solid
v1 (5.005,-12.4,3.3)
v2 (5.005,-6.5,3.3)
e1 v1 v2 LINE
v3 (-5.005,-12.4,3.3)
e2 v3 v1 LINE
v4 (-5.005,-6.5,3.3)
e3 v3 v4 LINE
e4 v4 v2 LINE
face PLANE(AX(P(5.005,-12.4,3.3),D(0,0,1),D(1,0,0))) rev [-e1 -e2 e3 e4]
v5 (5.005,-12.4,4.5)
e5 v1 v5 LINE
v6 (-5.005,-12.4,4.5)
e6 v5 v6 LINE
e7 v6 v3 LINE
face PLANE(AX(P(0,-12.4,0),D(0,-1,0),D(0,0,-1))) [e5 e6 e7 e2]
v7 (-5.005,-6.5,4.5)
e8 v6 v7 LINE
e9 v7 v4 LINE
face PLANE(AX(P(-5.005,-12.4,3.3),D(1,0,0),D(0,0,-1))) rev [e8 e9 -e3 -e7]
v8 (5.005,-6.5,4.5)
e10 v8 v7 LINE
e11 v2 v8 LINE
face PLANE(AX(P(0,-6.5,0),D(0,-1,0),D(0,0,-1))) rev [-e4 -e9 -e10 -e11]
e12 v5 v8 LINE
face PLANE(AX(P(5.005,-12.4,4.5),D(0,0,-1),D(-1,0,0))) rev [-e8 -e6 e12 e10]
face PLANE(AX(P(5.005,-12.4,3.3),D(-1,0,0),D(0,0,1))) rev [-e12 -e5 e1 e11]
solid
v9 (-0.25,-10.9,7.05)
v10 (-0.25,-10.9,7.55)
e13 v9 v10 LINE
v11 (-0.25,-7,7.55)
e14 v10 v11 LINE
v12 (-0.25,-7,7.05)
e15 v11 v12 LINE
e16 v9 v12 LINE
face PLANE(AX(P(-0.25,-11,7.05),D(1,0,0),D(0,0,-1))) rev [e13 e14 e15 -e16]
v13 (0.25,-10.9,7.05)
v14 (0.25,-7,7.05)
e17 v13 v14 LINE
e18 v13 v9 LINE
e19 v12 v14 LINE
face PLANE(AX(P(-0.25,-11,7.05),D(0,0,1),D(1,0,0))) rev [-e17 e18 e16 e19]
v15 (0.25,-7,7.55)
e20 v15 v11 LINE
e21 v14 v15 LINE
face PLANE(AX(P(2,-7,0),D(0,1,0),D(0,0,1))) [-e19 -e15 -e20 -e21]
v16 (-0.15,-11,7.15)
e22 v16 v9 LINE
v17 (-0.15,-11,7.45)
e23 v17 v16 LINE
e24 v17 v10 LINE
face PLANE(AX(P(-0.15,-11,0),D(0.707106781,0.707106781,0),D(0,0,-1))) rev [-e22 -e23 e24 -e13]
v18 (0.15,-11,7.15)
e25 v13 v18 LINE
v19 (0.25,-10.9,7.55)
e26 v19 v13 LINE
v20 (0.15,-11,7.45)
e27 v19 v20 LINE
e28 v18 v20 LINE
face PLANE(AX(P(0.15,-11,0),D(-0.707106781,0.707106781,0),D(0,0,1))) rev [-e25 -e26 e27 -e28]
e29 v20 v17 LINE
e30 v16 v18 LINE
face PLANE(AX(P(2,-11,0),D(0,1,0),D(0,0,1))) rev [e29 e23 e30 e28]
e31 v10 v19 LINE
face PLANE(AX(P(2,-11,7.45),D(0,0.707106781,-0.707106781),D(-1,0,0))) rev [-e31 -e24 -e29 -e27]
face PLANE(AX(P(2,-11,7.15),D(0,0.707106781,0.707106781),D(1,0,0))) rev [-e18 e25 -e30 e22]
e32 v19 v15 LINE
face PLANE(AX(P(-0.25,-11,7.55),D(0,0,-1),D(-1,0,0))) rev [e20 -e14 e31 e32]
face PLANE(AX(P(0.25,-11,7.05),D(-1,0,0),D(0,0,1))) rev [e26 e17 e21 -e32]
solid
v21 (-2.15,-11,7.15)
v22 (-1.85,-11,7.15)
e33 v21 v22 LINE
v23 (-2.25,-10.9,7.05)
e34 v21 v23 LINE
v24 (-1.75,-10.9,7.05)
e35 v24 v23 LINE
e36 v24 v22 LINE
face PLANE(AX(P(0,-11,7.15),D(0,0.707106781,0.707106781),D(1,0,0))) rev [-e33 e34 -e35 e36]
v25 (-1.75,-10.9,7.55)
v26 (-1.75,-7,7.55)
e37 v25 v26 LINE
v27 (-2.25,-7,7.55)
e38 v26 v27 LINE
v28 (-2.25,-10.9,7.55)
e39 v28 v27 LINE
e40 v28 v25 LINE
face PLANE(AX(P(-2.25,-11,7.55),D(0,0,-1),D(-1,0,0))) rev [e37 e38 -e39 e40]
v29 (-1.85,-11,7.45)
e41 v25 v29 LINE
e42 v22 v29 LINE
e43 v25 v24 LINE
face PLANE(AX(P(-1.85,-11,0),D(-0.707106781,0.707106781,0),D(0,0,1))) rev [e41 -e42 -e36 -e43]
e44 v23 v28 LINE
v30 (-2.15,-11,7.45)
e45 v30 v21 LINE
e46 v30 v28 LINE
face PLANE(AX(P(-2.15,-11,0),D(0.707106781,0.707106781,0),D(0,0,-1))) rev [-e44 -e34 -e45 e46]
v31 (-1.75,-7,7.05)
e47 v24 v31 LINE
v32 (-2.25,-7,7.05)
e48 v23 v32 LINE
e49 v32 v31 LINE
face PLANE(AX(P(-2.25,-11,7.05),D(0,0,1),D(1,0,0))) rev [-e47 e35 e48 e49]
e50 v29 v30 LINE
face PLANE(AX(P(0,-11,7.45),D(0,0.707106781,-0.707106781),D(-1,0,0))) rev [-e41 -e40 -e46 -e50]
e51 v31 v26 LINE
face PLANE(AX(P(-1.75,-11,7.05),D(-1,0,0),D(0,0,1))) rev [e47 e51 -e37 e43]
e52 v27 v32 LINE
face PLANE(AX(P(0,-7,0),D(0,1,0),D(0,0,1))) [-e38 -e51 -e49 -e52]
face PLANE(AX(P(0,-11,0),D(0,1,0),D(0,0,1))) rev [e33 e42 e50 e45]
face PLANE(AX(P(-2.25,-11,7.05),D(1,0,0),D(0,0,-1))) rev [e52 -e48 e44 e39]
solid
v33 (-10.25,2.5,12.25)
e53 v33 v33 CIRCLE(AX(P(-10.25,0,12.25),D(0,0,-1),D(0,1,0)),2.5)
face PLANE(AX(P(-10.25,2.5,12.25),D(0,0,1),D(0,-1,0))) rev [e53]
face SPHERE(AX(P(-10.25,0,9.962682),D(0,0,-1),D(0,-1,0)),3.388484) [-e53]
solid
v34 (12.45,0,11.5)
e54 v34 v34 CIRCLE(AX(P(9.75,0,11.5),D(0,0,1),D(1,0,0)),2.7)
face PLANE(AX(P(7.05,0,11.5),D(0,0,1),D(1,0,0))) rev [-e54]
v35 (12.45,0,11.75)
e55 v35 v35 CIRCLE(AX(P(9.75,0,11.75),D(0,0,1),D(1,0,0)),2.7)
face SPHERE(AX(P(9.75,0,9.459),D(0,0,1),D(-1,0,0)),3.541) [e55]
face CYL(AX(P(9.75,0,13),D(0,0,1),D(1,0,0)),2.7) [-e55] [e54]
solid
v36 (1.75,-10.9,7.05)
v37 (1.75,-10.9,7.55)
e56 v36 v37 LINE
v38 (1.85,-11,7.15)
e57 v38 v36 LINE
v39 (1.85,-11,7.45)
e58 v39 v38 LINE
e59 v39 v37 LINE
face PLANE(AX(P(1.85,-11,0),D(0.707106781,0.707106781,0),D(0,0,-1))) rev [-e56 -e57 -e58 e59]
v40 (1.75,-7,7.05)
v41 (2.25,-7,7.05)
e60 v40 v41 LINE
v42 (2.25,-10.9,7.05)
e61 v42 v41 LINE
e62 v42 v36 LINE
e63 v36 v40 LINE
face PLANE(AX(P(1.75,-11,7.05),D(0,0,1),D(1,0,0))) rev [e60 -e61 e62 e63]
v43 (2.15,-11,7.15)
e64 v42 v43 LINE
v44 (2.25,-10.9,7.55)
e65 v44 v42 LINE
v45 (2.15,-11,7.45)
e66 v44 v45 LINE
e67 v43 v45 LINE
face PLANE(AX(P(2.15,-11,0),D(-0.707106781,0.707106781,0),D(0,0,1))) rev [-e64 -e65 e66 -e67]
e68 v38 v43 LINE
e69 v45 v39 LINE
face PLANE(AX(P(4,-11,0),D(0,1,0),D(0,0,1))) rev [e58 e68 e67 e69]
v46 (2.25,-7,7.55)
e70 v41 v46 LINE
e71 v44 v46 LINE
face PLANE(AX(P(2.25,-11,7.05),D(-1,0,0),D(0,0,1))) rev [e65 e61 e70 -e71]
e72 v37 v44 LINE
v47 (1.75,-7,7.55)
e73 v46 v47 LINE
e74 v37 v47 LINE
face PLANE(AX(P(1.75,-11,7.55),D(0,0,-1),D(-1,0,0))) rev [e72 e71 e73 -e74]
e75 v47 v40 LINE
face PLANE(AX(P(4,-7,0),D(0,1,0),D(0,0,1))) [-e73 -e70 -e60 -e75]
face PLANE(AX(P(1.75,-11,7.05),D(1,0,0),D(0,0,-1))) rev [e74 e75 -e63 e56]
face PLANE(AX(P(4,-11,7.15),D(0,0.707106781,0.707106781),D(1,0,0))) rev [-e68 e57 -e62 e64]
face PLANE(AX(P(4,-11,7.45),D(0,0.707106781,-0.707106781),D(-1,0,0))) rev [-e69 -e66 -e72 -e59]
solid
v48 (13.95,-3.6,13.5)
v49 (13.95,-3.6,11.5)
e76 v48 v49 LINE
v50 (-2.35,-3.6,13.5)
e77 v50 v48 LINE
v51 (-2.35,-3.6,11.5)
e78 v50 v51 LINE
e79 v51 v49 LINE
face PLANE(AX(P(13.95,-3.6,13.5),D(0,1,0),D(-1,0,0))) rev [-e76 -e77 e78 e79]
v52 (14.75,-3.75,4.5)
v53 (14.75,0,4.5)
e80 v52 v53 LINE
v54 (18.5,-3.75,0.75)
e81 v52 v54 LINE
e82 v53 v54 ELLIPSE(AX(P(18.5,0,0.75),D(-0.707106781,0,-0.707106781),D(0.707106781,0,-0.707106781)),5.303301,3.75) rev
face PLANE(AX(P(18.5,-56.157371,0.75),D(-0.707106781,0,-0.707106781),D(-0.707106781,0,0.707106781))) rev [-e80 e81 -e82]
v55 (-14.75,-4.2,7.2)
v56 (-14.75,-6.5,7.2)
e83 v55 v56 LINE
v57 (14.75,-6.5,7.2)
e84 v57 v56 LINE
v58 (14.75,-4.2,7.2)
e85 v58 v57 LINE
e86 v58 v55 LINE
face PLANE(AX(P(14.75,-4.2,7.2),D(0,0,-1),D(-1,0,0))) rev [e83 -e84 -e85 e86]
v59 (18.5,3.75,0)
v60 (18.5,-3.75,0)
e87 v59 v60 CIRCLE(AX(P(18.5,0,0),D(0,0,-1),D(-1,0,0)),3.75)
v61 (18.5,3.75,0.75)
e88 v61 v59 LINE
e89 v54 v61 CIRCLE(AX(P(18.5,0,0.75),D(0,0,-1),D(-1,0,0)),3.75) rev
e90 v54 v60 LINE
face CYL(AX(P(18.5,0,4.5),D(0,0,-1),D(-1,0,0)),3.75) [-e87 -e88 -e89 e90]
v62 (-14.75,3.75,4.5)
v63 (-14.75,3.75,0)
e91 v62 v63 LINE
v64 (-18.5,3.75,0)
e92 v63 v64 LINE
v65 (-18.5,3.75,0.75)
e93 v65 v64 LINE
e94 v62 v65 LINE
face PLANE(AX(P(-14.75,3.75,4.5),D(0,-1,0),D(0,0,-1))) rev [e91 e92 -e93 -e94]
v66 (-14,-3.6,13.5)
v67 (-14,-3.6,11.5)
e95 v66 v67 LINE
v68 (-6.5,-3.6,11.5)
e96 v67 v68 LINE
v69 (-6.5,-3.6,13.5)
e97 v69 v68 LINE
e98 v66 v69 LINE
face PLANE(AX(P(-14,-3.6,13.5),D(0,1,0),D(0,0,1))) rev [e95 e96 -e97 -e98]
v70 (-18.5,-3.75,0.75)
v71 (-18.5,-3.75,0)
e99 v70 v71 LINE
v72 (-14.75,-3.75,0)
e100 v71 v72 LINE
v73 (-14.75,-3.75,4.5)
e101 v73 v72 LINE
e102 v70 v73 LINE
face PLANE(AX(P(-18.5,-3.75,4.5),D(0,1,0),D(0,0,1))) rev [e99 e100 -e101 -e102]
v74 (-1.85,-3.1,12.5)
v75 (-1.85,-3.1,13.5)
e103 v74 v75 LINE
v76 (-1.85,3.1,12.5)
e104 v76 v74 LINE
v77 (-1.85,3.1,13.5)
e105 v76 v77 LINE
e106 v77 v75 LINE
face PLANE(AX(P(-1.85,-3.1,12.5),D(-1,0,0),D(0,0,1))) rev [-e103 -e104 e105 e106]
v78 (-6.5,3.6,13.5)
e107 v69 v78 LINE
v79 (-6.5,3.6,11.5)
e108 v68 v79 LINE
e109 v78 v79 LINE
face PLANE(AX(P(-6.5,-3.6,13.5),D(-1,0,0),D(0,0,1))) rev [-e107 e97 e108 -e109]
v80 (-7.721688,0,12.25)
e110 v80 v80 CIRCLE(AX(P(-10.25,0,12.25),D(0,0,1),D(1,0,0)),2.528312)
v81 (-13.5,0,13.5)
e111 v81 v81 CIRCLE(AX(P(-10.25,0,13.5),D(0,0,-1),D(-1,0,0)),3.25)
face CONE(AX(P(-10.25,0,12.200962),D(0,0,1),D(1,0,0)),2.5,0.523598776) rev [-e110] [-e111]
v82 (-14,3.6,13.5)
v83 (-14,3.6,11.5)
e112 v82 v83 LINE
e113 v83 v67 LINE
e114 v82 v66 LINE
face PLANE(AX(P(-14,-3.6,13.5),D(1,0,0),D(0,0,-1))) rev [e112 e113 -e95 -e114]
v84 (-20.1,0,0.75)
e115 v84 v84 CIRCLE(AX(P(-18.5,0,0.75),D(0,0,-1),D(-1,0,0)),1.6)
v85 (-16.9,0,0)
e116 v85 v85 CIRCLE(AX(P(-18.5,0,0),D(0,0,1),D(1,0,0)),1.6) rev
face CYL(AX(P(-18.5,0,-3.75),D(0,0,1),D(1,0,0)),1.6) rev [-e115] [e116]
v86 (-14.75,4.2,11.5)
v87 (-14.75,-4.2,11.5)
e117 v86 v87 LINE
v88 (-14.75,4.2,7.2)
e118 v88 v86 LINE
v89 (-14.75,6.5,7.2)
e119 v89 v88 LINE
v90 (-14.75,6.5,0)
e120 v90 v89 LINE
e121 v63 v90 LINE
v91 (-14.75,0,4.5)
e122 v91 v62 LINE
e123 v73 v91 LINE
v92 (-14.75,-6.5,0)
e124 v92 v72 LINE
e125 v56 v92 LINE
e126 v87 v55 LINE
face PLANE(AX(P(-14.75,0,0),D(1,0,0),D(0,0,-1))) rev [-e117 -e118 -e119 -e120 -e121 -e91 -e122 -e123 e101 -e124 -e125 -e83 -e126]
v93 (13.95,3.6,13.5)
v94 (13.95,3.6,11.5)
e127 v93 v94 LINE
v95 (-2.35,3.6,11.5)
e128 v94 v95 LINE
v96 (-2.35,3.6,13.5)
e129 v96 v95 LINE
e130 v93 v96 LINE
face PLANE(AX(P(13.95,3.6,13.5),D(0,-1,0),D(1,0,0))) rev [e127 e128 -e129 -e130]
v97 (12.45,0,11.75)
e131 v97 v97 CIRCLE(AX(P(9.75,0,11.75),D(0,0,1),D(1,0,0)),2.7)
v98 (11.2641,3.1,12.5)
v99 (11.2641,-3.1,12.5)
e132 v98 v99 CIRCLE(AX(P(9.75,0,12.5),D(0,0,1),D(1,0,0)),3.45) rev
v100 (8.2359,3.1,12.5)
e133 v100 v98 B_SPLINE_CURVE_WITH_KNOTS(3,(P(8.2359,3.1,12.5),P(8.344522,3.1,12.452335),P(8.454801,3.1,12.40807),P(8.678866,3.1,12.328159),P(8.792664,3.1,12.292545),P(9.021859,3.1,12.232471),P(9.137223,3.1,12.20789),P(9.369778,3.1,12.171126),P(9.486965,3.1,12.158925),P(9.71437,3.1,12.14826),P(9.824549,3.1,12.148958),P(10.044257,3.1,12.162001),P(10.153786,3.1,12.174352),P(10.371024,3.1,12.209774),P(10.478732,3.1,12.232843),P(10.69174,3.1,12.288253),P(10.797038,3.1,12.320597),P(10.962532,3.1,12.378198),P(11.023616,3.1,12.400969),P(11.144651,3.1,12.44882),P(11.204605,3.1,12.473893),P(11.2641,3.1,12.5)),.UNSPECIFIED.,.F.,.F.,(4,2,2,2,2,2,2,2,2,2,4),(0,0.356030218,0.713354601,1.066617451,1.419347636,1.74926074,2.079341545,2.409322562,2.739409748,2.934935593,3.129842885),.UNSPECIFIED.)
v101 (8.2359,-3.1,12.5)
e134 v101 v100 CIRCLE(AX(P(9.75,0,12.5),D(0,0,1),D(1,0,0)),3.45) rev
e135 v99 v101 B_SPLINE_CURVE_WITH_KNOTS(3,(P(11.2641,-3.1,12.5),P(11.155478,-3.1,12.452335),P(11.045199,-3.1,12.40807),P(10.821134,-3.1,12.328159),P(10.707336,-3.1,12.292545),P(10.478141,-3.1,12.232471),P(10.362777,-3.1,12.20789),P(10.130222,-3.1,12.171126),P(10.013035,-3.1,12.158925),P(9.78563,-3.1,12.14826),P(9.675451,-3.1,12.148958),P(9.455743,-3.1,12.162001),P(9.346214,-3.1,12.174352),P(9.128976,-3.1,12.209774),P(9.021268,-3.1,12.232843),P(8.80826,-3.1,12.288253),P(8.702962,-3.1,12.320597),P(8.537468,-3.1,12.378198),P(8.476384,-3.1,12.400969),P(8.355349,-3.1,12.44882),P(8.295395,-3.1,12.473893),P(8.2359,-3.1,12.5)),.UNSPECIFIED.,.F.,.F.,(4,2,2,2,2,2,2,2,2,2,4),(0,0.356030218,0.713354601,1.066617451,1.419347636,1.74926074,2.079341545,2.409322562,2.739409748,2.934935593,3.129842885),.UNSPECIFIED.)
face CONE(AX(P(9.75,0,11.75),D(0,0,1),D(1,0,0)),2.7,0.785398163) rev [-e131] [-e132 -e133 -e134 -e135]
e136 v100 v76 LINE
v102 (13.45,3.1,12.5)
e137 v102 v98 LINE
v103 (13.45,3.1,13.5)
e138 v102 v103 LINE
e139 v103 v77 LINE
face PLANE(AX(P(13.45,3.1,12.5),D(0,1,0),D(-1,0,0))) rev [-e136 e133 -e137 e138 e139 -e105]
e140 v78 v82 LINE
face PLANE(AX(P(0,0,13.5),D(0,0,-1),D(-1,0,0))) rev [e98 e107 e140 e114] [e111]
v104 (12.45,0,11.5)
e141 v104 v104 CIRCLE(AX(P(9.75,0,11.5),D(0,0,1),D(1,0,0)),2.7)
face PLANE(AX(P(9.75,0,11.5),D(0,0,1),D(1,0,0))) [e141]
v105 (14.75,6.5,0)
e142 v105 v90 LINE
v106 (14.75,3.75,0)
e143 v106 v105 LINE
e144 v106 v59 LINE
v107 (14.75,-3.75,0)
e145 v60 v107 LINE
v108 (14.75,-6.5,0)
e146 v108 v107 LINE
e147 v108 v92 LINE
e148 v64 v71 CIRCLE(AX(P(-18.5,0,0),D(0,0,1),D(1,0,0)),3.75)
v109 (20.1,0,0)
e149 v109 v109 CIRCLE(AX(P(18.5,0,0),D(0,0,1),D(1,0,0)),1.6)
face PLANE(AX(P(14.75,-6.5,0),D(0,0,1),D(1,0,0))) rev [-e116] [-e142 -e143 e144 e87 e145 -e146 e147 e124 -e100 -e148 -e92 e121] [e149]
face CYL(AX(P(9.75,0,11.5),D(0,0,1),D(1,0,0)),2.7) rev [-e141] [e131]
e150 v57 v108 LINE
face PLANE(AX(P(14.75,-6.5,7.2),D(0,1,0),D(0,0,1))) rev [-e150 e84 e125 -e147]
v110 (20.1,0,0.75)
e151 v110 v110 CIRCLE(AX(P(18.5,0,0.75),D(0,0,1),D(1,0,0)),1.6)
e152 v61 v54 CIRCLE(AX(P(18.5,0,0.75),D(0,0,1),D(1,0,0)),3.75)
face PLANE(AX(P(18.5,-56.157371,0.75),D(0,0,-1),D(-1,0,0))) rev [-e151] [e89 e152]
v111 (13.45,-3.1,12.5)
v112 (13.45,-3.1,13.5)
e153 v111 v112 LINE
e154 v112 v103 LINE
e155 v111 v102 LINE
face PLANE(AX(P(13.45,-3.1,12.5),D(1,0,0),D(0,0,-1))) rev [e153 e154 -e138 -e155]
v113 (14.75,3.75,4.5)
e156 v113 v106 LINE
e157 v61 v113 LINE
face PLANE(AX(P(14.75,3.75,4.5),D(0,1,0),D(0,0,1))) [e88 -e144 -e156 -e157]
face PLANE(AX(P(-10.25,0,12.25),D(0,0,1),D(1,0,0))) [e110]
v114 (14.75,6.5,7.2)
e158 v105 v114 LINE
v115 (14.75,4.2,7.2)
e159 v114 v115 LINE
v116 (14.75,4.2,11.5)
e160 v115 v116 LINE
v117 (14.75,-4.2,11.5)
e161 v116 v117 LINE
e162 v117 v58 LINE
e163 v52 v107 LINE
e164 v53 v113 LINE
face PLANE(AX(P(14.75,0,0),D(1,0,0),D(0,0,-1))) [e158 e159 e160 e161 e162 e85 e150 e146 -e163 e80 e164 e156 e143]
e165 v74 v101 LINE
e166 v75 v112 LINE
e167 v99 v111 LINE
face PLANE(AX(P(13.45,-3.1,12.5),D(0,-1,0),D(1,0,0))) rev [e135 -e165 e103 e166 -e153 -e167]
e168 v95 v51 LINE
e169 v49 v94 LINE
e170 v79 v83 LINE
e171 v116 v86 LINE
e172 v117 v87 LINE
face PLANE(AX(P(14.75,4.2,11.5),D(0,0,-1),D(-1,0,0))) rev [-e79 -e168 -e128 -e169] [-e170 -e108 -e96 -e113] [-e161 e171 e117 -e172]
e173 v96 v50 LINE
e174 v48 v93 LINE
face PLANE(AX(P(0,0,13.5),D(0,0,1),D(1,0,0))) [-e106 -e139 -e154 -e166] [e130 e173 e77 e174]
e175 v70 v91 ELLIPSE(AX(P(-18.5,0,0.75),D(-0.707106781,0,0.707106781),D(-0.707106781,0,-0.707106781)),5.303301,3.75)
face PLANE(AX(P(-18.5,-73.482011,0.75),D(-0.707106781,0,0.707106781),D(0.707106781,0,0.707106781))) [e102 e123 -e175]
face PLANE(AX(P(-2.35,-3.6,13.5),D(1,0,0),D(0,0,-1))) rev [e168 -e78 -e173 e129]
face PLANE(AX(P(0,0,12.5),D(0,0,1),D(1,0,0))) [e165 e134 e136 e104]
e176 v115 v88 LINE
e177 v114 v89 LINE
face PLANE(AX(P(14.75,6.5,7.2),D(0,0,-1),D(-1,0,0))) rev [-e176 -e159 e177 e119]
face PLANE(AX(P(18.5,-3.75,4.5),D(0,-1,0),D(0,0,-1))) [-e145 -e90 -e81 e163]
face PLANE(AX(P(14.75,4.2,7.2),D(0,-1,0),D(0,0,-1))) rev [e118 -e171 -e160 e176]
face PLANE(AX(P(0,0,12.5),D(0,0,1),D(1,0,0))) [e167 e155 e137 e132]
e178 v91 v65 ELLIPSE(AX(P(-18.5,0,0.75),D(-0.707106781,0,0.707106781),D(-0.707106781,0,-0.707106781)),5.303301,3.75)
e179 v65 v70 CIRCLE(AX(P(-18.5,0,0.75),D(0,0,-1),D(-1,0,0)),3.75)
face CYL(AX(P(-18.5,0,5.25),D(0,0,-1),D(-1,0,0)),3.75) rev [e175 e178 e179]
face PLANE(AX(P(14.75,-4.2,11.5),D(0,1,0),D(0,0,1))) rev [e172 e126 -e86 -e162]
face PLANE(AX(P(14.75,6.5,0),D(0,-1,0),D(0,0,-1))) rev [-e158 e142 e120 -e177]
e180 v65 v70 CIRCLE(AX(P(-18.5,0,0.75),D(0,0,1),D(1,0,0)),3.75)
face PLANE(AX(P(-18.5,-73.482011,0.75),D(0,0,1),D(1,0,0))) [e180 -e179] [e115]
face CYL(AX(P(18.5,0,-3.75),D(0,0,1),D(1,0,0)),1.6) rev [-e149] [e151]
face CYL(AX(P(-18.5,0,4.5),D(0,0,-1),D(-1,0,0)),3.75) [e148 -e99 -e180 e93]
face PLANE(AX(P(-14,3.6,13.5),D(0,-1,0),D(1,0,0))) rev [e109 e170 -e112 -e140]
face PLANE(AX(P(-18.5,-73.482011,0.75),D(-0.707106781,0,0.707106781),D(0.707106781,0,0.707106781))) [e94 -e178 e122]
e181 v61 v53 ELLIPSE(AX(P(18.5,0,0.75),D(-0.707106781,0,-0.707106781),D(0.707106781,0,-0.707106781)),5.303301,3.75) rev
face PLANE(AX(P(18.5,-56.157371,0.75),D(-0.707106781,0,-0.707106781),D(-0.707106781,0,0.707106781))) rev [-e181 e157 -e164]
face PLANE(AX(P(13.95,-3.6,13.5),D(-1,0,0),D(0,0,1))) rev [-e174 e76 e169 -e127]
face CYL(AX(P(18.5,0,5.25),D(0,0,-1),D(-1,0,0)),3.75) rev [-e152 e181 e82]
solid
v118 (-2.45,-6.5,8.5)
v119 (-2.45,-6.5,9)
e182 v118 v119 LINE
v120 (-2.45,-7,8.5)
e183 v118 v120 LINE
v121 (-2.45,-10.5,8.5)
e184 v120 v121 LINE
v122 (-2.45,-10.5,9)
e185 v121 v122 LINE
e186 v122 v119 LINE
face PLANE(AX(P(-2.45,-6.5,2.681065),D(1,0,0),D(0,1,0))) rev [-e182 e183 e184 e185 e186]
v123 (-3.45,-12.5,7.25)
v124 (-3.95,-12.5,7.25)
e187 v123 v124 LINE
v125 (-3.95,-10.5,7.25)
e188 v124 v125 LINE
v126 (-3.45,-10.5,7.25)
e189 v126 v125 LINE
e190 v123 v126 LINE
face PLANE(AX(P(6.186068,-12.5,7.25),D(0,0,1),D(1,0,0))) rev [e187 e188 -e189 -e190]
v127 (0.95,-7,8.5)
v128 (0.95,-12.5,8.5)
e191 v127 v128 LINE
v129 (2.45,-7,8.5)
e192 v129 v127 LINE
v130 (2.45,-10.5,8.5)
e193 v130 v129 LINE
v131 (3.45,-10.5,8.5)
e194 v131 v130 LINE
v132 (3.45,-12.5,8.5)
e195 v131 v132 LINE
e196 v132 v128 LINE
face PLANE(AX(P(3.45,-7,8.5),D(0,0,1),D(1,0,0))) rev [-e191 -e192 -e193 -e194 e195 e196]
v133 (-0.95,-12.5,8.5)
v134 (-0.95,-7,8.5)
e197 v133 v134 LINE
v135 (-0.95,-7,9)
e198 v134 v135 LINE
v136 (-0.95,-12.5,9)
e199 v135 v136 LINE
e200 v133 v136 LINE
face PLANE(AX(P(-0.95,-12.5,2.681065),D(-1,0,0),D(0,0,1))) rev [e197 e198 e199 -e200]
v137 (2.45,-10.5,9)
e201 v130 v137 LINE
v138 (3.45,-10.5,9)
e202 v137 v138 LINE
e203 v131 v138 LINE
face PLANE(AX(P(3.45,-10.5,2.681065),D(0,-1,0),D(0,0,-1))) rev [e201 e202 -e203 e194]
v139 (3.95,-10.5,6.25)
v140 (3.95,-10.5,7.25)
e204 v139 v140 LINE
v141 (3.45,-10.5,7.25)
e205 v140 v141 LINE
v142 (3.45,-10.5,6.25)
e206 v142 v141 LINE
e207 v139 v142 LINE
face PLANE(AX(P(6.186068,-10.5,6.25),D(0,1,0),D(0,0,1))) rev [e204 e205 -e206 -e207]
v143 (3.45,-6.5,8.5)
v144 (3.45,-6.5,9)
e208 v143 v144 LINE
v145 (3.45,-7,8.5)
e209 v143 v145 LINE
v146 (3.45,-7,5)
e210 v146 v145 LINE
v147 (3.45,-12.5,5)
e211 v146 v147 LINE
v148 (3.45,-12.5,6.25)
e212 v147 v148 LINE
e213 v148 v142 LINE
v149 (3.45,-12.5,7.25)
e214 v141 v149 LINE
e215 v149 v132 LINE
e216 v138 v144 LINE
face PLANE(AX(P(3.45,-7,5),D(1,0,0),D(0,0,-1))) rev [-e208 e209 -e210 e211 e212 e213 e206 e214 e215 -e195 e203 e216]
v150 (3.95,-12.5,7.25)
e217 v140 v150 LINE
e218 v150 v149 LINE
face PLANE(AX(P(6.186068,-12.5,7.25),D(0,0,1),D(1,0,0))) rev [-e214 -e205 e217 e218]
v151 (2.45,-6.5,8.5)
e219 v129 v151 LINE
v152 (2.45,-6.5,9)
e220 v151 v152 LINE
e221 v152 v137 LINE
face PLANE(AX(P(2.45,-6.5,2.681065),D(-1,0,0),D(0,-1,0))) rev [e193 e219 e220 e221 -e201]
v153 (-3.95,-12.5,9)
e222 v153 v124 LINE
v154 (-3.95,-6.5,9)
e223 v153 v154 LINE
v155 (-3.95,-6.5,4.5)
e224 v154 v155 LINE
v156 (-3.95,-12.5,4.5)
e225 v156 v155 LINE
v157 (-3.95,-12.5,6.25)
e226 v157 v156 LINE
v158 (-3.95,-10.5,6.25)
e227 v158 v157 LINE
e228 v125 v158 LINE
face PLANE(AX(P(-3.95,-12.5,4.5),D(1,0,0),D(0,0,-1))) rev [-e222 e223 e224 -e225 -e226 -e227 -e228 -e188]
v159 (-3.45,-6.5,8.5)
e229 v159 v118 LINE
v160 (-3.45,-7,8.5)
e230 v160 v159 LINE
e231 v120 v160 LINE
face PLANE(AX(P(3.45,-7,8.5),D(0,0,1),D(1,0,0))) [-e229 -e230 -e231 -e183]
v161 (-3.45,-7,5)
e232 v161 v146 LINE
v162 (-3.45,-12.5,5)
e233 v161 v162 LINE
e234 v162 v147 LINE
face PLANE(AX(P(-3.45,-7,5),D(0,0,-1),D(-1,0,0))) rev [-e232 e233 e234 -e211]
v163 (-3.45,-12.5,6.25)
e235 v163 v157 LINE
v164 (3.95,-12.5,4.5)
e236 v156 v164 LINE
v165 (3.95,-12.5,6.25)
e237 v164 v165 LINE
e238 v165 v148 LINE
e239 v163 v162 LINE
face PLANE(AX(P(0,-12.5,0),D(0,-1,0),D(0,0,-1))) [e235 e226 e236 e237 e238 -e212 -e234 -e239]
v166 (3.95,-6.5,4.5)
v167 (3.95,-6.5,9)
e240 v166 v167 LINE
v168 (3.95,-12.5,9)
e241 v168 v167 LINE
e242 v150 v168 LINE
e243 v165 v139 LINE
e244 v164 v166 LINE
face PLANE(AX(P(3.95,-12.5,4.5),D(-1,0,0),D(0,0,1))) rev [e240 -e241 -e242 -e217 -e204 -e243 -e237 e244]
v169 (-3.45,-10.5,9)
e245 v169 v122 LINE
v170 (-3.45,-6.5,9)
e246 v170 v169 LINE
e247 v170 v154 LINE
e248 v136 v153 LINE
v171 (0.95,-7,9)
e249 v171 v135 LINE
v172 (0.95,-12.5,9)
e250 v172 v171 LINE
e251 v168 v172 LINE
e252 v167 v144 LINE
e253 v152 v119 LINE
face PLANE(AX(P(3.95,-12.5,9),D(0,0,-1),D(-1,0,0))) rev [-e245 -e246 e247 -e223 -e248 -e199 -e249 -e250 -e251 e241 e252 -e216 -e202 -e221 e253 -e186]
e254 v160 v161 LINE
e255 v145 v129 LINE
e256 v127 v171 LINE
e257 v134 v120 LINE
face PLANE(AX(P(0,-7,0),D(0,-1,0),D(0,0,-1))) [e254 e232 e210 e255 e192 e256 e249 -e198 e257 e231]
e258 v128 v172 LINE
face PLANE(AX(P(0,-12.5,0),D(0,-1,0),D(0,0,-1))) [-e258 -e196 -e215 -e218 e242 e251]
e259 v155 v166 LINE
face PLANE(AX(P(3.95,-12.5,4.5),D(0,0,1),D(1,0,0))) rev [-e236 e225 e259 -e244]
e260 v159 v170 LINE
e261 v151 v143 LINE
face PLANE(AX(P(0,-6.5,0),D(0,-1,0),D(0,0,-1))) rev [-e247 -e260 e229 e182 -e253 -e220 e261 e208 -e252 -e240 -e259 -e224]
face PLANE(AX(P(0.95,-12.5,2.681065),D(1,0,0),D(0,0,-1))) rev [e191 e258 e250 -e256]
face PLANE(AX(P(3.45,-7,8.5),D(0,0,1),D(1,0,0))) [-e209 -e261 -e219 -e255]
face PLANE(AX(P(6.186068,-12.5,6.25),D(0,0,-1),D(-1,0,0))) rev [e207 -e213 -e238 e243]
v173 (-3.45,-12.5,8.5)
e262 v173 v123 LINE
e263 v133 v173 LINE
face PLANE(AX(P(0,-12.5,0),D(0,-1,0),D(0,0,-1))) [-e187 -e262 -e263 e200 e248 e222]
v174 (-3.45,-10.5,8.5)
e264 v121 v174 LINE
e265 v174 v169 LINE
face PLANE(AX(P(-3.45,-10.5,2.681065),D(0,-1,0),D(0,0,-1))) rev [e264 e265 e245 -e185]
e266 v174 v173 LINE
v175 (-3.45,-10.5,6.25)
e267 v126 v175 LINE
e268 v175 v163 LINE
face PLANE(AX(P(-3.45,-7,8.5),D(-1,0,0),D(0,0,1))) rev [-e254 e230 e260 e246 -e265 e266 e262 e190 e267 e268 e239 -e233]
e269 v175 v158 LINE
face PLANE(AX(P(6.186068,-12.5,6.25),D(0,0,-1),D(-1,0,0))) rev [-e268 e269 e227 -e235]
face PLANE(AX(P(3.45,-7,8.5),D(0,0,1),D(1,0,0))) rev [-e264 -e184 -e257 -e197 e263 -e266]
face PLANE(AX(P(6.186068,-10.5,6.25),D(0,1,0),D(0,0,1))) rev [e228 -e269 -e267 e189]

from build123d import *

# Parameters (mm, degrees)
BOSS_EXTRUDE5_DEPTH  = 14.75
SKETCH9_W            = 7.5
SKETCH9_H            = 7.2
SKETCH9_W_2          = 16.3
BOSS_EXTRUDE6_DEPTH  = 2
SKETCH10_W           = 15.3
SKETCH10_H           = 6.2
CUT_EXTRUDE4_DEPTH   = 1
SKETCH11_R           = 2.5
CUT_EXTRUDE5_DEPTH   = 1.25
BOSS_EXTRUDE7_DEPTH  = 4.5
CUT_EXTRUDE7_START   = -7.5
CUT_EXTRUDE7_DEPTH   = 7.5
SKETCH18_R           = 3.75
CUT_EXTRUDE8_DEPTH   = 4.5
SKETCH19_R           = 1.6
CUT_EXTRUDE9_DEPTH   = 4.5
CHAMFER1_SIZE        = 0.75
CHAMFER1_SIZE_2      = 1.299038106
SKETCH13_R           = 2.7
CUT_EXTRUDE6_DEPTH   = 1
CHAMFER2_SIZE        = 0.75
SKETCH20_W           = 10.01
SKETCH20_H           = 1.2
BOSS_EXTRUDE8_DEPTH  = 5.9
SKETCH21_W           = 7.9
SKETCH21_H           = 4.5
BOSS_EXTRUDE9_DEPTH  = 6
SKETCH23_W           = 6.9
SKETCH23_H           = 3.5
CUT_EXTRUDE11_DEPTH  = 5.5
SKETCH24_W           = 1.9
SKETCH24_H           = 5.5
SKETCH24_W_2         = 1
SKETCH24_H_2         = 4
CUT_EXTRUDE12_DEPTH  = 0.5
CUT_EXTRUDE13_REACH  = 34.015
SKETCH25_W           = 1
SKETCH25_H           = 2
SKETCH26_W           = 0.5
SKETCH26_H           = 0.5
BOSS_EXTRUDE10_DEPTH = 4
CHAMFER3_SIZE        = 0.1
LPATTERN1_COUNT      = 3
LPATTERN1_PITCH      = 2


# Read off the part's stored shape, not the designer's step: Cut-Extrude7
with BuildPart() as part:
    # Sketch8 → Boss-Extrude5 (new, symmetric)
    with BuildSketch(Plane(origin=(0, 0, 0), x_dir=(0, 0, -1), z_dir=(1, 0, 0))):
        Polygon((0, -6.5), (0, 6.5), (-7.2, 6.5), (-7.2, 4.2), (-11.5, 4.2), (-11.5, -4.2), (-7.2, -4.2), (-7.2, -6.5), align=None)
    extrude(amount=BOSS_EXTRUDE5_DEPTH, both=True)

    # Sketch9 → Boss-Extrude6 (add)
    with BuildSketch(Plane.XY.offset(11.5)):
        with Locations((-10.25, 0)):
            Rectangle(SKETCH9_W, SKETCH9_H)
        with Locations((5.8, 0)):
            Rectangle(SKETCH9_W_2, SKETCH9_H)
    extrude(amount=BOSS_EXTRUDE6_DEPTH)

    # Sketch10 → Cut-Extrude4 (cut)
    with BuildSketch(Plane.XY.offset(13.5)):
        with Locations((5.8, 0)):
            Rectangle(SKETCH10_W, SKETCH10_H)
    extrude(amount=-CUT_EXTRUDE4_DEPTH, mode=Mode.SUBTRACT)

    # Sketch11 → Cut-Extrude5 (cut)
    with BuildSketch(Plane.XY.offset(13.5)):
        with Locations((-10.25, 0)):
            Circle(SKETCH11_R)
    extrude(amount=-CUT_EXTRUDE5_DEPTH, mode=Mode.SUBTRACT)

    # Sketch16 → Boss-Extrude7 (add)
    with BuildSketch(Plane(origin=(0, 0, 0), x_dir=(-1, 0, 0), z_dir=(0, 0, -1))):
        with BuildLine():
            Line((-14.75, -3.75), (-14.75, 3.75))
            Line((-14.75, 3.75), (-18.5, 3.75))
            ThreePointArc((-18.5, 3.75), (-22.25, 0), (-18.5, -3.75))
            Line((-18.5, -3.75), (-14.75, -3.75))
        make_face()
    boss_extrude7 = extrude(amount=-BOSS_EXTRUDE7_DEPTH)

    # Cut-Extrude7 outline → Cut-Extrude7 (cut)
    with BuildSketch(Plane.XZ.offset(3.75).offset(CUT_EXTRUDE7_START)):
        Polygon((14.75, 4.5), (18.5, 0.75), (24, 0.75), (24, 4.5), align=None)
    cut_extrude7 = extrude(amount=CUT_EXTRUDE7_DEPTH, mode=Mode.SUBTRACT)

    # Sketch18 → Cut-Extrude8 (cut)
    with BuildSketch(Plane.XY.offset(0.75)):
        with Locations((18.5, 0)):
            Circle(SKETCH18_R)
    cut_extrude8 = extrude(amount=CUT_EXTRUDE8_DEPTH, mode=Mode.SUBTRACT)

    # Sketch19 → Cut-Extrude9 (cut)
    with BuildSketch(Plane.XY.offset(0.75)):
        with Locations((18.5, 0)):
            Circle(SKETCH19_R)
    cut_extrude9 = extrude(amount=-CUT_EXTRUDE9_DEPTH, mode=Mode.SUBTRACT)

    # Mirror1: Boss-Extrude7, Cut-Extrude7, Cut-Extrude8, Cut-Extrude9 across plane
    add(boss_extrude7.mirror(Plane(origin=(0, 0, 0), x_dir=(0, 0, 1), z_dir=(1, 0, 0))))
    add(cut_extrude7.mirror(Plane(origin=(0, 0, 0), x_dir=(0, 0, 1), z_dir=(1, 0, 0))), mode=Mode.SUBTRACT)
    add(cut_extrude8.mirror(Plane(origin=(0, 0, 0), x_dir=(0, 0, 1), z_dir=(1, 0, 0))), mode=Mode.SUBTRACT)
    add(cut_extrude9.mirror(Plane(origin=(0, 0, 0), x_dir=(0, 0, 1), z_dir=(1, 0, 0))), mode=Mode.SUBTRACT)

    # Chamfer1
    # the kernel refuses this chamfer: 1.299038106, 0.75 mm, written as the material it takes off along each edge
    with BuildSketch(Plane(origin=(-10.25, 0, 13.5), x_dir=(1, 0, 0), z_dir=(0, -1, 0))) as chamfer1_piece_1_section:
        Polygon((2.5 + CHAMFER1_SIZE, 0), (2.5, -CHAMFER1_SIZE_2), (2.5, 0), align=None)
    chamfer1_piece_1 = revolve(axis=Axis((-10.25, 0, 13.5), (0, 0, 1)), mode=Mode.PRIVATE)
    chamfer1_piece_1 = split(chamfer1_piece_1, bisect_by=Plane(origin=(-13.133837987, 0, 12.25), z_dir=(0, 0, 1)), keep=Keep.TOP, mode=Mode.PRIVATE)
    add(chamfer1_piece_1, mode=Mode.SUBTRACT)

    # Sketch13 → Cut-Extrude6 (cut)
    with BuildSketch(Plane.XY.offset(12.5)):
        with Locations((9.75, 0)):
            Circle(SKETCH13_R)
    extrude(amount=-CUT_EXTRUDE6_DEPTH, mode=Mode.SUBTRACT)

    # Chamfer2
    # the kernel refuses this chamfer: 0.75 mm, written as the material it takes off along each edge
    with BuildSketch(Plane(origin=(9.75, 0, 12.5), x_dir=(1, 0, 0), z_dir=(0, -1, 0))) as chamfer2_piece_1_section:
        Polygon((2.7 + CHAMFER2_SIZE, 0), (2.7, -CHAMFER2_SIZE), (2.7, 0), align=None)
    chamfer2_piece_1 = revolve(axis=Axis((9.75, 0, 12.5), (0, 0, 1)), mode=Mode.PRIVATE)
    chamfer2_piece_1 = split(chamfer2_piece_1, bisect_by=Plane(origin=(6.68747717, -3.1, 12.13747717), z_dir=(0, 1, 0)), keep=Keep.TOP, mode=Mode.PRIVATE)
    chamfer2_piece_1 = split(chamfer2_piece_1, bisect_by=Plane(origin=(6.68747717, 3.1, 12.13747717), z_dir=(0, -1, 0)), keep=Keep.TOP, mode=Mode.PRIVATE)
    add(chamfer2_piece_1, mode=Mode.SUBTRACT)


with BuildPart() as body_2:
    # Sketch12 → Revolve1 (revolve)
    with BuildSketch(Plane.ZY.offset(10.25), mode=Mode.PRIVATE) as revolve1_sk:
        with BuildLine():
            Line((12.25, 2.5), (12.25, 0))
            Line((12.25, 0), (13.351165831, 0))
            ThreePointArc((13.351165831, 0), (13.063678836, 1.365884895), (12.25, 2.5))
        make_face()
    revolve(revolve1_sk.sketch.rotate(Axis((-10.25, 0, 12.25), (0, 0, 1)), 180), axis=Axis((-10.25, 0, 12.25), (0, 0, 1)))


with BuildPart() as body_3:
    # Sketch15 → Revolve2 (revolve)
    with BuildSketch(Plane(origin=(0, 0, 0), x_dir=(1, 0, 0), z_dir=(0, 1, 0))):
        with BuildLine():
            Line((9.75, -11.5), (9.75, -13))
            ThreePointArc((9.75, -13), (8.262342445, -12.672340318), (7.05, -11.75))
            Line((7.05, -11.75), (7.05, -11.5))
            Line((7.05, -11.5), (9.75, -11.5))
        make_face()
    revolve(axis=Axis((9.75, 0, 13), (0, 0, -1)))


with BuildPart() as body_4:
    # Sketch20 → Boss-Extrude8 (new body)
    with BuildSketch(Plane.XZ.offset(6.5)):
        with Locations((0, 3.9)):
            Rectangle(SKETCH20_W, SKETCH20_H)
    extrude(amount=BOSS_EXTRUDE8_DEPTH)


with BuildPart() as body_5:
    # Sketch21 → Boss-Extrude9 (new body)
    with BuildSketch(Plane.XZ.offset(6.5)):
        with Locations((0, 6.75)):
            Rectangle(SKETCH21_W, SKETCH21_H)
    extrude(amount=BOSS_EXTRUDE9_DEPTH)

    # Sketch23 → Cut-Extrude11 (cut)
    with BuildSketch(Plane.XZ.offset(12.5)):
        with Locations((0, 6.75)):
            Rectangle(SKETCH23_W, SKETCH23_H)
    extrude(amount=-CUT_EXTRUDE11_DEPTH, mode=Mode.SUBTRACT)

    # Sketch24 → Cut-Extrude12 (cut)
    with BuildSketch(Plane.XY.offset(9)):
        with Locations((0, -9.75)):
            Rectangle(SKETCH24_W, SKETCH24_H)
        with Locations((-2.95, -8.5)):
            Rectangle(SKETCH24_W_2, SKETCH24_H_2)
        with Locations((2.95, -8.5)):
            Rectangle(SKETCH24_W_2, SKETCH24_H_2)
    extrude(amount=-CUT_EXTRUDE12_DEPTH, mode=Mode.SUBTRACT)

    # Cut-Extrude13: up to this face of the body (flat: up to its plane)
    cut_extrude13_end = Plane(body_5.part.faces().sort_by_distance((3.95, -9.5, 6.75))[0])
    # Sketch25 → Cut-Extrude13 (cut, up to the picked face)
    with BuildSketch(Plane.ZY.offset(3.95), mode=Mode.PRIVATE) as cut_extrude13_sk1:
        with Locations((6.75, -11.5)):
            Rectangle(SKETCH25_W, SKETCH25_H)
    cut_extrude13_tool1 = split(extrude(cut_extrude13_sk1.sketch, amount=-CUT_EXTRUDE13_REACH, mode=Mode.PRIVATE), bisect_by=cut_extrude13_end, keep=Keep.BOTH, mode=Mode.PRIVATE)
    add(cut_extrude13_tool1.solids().sort_by(Axis((-3.95, -11.5, 6.75), (1, 0, 0)))[0], mode=Mode.SUBTRACT)


with BuildPart() as body_6:
    # Sketch26 → Boss-Extrude10 (new body)
    with BuildSketch(Plane.XZ.offset(7)):
        with Locations((-2, 7.3)):
            Rectangle(SKETCH26_W, SKETCH26_H)
    extrude(amount=BOSS_EXTRUDE10_DEPTH)

    # Chamfer3
    chamfer3_edges = [body_6.edges().sort_by_distance(p)[0] for p in [
        (-2.25, -11, 7.3),
        (-2, -11, 7.05),
        (-1.75, -11, 7.3),
        (-2, -11, 7.55),
    ]]
    chamfer(chamfer3_edges, length=CHAMFER3_SIZE)


with BuildPart() as lpattern1_1:
    # LPattern1: pattern copy
    add(body_6.part.moved(Location(Vector(1, 0, 0) * (1 * LPATTERN1_PITCH))))


with BuildPart() as lpattern1_2:
    # LPattern1: pattern copy
    add(body_6.part.moved(Location(Vector(1, 0, 0) * (2 * LPATTERN1_PITCH))))


solid = Compound([part.part, body_2.part, body_3.part, body_4.part, body_5.part, body_6.part, lpattern1_1.part, lpattern1_2.part])
